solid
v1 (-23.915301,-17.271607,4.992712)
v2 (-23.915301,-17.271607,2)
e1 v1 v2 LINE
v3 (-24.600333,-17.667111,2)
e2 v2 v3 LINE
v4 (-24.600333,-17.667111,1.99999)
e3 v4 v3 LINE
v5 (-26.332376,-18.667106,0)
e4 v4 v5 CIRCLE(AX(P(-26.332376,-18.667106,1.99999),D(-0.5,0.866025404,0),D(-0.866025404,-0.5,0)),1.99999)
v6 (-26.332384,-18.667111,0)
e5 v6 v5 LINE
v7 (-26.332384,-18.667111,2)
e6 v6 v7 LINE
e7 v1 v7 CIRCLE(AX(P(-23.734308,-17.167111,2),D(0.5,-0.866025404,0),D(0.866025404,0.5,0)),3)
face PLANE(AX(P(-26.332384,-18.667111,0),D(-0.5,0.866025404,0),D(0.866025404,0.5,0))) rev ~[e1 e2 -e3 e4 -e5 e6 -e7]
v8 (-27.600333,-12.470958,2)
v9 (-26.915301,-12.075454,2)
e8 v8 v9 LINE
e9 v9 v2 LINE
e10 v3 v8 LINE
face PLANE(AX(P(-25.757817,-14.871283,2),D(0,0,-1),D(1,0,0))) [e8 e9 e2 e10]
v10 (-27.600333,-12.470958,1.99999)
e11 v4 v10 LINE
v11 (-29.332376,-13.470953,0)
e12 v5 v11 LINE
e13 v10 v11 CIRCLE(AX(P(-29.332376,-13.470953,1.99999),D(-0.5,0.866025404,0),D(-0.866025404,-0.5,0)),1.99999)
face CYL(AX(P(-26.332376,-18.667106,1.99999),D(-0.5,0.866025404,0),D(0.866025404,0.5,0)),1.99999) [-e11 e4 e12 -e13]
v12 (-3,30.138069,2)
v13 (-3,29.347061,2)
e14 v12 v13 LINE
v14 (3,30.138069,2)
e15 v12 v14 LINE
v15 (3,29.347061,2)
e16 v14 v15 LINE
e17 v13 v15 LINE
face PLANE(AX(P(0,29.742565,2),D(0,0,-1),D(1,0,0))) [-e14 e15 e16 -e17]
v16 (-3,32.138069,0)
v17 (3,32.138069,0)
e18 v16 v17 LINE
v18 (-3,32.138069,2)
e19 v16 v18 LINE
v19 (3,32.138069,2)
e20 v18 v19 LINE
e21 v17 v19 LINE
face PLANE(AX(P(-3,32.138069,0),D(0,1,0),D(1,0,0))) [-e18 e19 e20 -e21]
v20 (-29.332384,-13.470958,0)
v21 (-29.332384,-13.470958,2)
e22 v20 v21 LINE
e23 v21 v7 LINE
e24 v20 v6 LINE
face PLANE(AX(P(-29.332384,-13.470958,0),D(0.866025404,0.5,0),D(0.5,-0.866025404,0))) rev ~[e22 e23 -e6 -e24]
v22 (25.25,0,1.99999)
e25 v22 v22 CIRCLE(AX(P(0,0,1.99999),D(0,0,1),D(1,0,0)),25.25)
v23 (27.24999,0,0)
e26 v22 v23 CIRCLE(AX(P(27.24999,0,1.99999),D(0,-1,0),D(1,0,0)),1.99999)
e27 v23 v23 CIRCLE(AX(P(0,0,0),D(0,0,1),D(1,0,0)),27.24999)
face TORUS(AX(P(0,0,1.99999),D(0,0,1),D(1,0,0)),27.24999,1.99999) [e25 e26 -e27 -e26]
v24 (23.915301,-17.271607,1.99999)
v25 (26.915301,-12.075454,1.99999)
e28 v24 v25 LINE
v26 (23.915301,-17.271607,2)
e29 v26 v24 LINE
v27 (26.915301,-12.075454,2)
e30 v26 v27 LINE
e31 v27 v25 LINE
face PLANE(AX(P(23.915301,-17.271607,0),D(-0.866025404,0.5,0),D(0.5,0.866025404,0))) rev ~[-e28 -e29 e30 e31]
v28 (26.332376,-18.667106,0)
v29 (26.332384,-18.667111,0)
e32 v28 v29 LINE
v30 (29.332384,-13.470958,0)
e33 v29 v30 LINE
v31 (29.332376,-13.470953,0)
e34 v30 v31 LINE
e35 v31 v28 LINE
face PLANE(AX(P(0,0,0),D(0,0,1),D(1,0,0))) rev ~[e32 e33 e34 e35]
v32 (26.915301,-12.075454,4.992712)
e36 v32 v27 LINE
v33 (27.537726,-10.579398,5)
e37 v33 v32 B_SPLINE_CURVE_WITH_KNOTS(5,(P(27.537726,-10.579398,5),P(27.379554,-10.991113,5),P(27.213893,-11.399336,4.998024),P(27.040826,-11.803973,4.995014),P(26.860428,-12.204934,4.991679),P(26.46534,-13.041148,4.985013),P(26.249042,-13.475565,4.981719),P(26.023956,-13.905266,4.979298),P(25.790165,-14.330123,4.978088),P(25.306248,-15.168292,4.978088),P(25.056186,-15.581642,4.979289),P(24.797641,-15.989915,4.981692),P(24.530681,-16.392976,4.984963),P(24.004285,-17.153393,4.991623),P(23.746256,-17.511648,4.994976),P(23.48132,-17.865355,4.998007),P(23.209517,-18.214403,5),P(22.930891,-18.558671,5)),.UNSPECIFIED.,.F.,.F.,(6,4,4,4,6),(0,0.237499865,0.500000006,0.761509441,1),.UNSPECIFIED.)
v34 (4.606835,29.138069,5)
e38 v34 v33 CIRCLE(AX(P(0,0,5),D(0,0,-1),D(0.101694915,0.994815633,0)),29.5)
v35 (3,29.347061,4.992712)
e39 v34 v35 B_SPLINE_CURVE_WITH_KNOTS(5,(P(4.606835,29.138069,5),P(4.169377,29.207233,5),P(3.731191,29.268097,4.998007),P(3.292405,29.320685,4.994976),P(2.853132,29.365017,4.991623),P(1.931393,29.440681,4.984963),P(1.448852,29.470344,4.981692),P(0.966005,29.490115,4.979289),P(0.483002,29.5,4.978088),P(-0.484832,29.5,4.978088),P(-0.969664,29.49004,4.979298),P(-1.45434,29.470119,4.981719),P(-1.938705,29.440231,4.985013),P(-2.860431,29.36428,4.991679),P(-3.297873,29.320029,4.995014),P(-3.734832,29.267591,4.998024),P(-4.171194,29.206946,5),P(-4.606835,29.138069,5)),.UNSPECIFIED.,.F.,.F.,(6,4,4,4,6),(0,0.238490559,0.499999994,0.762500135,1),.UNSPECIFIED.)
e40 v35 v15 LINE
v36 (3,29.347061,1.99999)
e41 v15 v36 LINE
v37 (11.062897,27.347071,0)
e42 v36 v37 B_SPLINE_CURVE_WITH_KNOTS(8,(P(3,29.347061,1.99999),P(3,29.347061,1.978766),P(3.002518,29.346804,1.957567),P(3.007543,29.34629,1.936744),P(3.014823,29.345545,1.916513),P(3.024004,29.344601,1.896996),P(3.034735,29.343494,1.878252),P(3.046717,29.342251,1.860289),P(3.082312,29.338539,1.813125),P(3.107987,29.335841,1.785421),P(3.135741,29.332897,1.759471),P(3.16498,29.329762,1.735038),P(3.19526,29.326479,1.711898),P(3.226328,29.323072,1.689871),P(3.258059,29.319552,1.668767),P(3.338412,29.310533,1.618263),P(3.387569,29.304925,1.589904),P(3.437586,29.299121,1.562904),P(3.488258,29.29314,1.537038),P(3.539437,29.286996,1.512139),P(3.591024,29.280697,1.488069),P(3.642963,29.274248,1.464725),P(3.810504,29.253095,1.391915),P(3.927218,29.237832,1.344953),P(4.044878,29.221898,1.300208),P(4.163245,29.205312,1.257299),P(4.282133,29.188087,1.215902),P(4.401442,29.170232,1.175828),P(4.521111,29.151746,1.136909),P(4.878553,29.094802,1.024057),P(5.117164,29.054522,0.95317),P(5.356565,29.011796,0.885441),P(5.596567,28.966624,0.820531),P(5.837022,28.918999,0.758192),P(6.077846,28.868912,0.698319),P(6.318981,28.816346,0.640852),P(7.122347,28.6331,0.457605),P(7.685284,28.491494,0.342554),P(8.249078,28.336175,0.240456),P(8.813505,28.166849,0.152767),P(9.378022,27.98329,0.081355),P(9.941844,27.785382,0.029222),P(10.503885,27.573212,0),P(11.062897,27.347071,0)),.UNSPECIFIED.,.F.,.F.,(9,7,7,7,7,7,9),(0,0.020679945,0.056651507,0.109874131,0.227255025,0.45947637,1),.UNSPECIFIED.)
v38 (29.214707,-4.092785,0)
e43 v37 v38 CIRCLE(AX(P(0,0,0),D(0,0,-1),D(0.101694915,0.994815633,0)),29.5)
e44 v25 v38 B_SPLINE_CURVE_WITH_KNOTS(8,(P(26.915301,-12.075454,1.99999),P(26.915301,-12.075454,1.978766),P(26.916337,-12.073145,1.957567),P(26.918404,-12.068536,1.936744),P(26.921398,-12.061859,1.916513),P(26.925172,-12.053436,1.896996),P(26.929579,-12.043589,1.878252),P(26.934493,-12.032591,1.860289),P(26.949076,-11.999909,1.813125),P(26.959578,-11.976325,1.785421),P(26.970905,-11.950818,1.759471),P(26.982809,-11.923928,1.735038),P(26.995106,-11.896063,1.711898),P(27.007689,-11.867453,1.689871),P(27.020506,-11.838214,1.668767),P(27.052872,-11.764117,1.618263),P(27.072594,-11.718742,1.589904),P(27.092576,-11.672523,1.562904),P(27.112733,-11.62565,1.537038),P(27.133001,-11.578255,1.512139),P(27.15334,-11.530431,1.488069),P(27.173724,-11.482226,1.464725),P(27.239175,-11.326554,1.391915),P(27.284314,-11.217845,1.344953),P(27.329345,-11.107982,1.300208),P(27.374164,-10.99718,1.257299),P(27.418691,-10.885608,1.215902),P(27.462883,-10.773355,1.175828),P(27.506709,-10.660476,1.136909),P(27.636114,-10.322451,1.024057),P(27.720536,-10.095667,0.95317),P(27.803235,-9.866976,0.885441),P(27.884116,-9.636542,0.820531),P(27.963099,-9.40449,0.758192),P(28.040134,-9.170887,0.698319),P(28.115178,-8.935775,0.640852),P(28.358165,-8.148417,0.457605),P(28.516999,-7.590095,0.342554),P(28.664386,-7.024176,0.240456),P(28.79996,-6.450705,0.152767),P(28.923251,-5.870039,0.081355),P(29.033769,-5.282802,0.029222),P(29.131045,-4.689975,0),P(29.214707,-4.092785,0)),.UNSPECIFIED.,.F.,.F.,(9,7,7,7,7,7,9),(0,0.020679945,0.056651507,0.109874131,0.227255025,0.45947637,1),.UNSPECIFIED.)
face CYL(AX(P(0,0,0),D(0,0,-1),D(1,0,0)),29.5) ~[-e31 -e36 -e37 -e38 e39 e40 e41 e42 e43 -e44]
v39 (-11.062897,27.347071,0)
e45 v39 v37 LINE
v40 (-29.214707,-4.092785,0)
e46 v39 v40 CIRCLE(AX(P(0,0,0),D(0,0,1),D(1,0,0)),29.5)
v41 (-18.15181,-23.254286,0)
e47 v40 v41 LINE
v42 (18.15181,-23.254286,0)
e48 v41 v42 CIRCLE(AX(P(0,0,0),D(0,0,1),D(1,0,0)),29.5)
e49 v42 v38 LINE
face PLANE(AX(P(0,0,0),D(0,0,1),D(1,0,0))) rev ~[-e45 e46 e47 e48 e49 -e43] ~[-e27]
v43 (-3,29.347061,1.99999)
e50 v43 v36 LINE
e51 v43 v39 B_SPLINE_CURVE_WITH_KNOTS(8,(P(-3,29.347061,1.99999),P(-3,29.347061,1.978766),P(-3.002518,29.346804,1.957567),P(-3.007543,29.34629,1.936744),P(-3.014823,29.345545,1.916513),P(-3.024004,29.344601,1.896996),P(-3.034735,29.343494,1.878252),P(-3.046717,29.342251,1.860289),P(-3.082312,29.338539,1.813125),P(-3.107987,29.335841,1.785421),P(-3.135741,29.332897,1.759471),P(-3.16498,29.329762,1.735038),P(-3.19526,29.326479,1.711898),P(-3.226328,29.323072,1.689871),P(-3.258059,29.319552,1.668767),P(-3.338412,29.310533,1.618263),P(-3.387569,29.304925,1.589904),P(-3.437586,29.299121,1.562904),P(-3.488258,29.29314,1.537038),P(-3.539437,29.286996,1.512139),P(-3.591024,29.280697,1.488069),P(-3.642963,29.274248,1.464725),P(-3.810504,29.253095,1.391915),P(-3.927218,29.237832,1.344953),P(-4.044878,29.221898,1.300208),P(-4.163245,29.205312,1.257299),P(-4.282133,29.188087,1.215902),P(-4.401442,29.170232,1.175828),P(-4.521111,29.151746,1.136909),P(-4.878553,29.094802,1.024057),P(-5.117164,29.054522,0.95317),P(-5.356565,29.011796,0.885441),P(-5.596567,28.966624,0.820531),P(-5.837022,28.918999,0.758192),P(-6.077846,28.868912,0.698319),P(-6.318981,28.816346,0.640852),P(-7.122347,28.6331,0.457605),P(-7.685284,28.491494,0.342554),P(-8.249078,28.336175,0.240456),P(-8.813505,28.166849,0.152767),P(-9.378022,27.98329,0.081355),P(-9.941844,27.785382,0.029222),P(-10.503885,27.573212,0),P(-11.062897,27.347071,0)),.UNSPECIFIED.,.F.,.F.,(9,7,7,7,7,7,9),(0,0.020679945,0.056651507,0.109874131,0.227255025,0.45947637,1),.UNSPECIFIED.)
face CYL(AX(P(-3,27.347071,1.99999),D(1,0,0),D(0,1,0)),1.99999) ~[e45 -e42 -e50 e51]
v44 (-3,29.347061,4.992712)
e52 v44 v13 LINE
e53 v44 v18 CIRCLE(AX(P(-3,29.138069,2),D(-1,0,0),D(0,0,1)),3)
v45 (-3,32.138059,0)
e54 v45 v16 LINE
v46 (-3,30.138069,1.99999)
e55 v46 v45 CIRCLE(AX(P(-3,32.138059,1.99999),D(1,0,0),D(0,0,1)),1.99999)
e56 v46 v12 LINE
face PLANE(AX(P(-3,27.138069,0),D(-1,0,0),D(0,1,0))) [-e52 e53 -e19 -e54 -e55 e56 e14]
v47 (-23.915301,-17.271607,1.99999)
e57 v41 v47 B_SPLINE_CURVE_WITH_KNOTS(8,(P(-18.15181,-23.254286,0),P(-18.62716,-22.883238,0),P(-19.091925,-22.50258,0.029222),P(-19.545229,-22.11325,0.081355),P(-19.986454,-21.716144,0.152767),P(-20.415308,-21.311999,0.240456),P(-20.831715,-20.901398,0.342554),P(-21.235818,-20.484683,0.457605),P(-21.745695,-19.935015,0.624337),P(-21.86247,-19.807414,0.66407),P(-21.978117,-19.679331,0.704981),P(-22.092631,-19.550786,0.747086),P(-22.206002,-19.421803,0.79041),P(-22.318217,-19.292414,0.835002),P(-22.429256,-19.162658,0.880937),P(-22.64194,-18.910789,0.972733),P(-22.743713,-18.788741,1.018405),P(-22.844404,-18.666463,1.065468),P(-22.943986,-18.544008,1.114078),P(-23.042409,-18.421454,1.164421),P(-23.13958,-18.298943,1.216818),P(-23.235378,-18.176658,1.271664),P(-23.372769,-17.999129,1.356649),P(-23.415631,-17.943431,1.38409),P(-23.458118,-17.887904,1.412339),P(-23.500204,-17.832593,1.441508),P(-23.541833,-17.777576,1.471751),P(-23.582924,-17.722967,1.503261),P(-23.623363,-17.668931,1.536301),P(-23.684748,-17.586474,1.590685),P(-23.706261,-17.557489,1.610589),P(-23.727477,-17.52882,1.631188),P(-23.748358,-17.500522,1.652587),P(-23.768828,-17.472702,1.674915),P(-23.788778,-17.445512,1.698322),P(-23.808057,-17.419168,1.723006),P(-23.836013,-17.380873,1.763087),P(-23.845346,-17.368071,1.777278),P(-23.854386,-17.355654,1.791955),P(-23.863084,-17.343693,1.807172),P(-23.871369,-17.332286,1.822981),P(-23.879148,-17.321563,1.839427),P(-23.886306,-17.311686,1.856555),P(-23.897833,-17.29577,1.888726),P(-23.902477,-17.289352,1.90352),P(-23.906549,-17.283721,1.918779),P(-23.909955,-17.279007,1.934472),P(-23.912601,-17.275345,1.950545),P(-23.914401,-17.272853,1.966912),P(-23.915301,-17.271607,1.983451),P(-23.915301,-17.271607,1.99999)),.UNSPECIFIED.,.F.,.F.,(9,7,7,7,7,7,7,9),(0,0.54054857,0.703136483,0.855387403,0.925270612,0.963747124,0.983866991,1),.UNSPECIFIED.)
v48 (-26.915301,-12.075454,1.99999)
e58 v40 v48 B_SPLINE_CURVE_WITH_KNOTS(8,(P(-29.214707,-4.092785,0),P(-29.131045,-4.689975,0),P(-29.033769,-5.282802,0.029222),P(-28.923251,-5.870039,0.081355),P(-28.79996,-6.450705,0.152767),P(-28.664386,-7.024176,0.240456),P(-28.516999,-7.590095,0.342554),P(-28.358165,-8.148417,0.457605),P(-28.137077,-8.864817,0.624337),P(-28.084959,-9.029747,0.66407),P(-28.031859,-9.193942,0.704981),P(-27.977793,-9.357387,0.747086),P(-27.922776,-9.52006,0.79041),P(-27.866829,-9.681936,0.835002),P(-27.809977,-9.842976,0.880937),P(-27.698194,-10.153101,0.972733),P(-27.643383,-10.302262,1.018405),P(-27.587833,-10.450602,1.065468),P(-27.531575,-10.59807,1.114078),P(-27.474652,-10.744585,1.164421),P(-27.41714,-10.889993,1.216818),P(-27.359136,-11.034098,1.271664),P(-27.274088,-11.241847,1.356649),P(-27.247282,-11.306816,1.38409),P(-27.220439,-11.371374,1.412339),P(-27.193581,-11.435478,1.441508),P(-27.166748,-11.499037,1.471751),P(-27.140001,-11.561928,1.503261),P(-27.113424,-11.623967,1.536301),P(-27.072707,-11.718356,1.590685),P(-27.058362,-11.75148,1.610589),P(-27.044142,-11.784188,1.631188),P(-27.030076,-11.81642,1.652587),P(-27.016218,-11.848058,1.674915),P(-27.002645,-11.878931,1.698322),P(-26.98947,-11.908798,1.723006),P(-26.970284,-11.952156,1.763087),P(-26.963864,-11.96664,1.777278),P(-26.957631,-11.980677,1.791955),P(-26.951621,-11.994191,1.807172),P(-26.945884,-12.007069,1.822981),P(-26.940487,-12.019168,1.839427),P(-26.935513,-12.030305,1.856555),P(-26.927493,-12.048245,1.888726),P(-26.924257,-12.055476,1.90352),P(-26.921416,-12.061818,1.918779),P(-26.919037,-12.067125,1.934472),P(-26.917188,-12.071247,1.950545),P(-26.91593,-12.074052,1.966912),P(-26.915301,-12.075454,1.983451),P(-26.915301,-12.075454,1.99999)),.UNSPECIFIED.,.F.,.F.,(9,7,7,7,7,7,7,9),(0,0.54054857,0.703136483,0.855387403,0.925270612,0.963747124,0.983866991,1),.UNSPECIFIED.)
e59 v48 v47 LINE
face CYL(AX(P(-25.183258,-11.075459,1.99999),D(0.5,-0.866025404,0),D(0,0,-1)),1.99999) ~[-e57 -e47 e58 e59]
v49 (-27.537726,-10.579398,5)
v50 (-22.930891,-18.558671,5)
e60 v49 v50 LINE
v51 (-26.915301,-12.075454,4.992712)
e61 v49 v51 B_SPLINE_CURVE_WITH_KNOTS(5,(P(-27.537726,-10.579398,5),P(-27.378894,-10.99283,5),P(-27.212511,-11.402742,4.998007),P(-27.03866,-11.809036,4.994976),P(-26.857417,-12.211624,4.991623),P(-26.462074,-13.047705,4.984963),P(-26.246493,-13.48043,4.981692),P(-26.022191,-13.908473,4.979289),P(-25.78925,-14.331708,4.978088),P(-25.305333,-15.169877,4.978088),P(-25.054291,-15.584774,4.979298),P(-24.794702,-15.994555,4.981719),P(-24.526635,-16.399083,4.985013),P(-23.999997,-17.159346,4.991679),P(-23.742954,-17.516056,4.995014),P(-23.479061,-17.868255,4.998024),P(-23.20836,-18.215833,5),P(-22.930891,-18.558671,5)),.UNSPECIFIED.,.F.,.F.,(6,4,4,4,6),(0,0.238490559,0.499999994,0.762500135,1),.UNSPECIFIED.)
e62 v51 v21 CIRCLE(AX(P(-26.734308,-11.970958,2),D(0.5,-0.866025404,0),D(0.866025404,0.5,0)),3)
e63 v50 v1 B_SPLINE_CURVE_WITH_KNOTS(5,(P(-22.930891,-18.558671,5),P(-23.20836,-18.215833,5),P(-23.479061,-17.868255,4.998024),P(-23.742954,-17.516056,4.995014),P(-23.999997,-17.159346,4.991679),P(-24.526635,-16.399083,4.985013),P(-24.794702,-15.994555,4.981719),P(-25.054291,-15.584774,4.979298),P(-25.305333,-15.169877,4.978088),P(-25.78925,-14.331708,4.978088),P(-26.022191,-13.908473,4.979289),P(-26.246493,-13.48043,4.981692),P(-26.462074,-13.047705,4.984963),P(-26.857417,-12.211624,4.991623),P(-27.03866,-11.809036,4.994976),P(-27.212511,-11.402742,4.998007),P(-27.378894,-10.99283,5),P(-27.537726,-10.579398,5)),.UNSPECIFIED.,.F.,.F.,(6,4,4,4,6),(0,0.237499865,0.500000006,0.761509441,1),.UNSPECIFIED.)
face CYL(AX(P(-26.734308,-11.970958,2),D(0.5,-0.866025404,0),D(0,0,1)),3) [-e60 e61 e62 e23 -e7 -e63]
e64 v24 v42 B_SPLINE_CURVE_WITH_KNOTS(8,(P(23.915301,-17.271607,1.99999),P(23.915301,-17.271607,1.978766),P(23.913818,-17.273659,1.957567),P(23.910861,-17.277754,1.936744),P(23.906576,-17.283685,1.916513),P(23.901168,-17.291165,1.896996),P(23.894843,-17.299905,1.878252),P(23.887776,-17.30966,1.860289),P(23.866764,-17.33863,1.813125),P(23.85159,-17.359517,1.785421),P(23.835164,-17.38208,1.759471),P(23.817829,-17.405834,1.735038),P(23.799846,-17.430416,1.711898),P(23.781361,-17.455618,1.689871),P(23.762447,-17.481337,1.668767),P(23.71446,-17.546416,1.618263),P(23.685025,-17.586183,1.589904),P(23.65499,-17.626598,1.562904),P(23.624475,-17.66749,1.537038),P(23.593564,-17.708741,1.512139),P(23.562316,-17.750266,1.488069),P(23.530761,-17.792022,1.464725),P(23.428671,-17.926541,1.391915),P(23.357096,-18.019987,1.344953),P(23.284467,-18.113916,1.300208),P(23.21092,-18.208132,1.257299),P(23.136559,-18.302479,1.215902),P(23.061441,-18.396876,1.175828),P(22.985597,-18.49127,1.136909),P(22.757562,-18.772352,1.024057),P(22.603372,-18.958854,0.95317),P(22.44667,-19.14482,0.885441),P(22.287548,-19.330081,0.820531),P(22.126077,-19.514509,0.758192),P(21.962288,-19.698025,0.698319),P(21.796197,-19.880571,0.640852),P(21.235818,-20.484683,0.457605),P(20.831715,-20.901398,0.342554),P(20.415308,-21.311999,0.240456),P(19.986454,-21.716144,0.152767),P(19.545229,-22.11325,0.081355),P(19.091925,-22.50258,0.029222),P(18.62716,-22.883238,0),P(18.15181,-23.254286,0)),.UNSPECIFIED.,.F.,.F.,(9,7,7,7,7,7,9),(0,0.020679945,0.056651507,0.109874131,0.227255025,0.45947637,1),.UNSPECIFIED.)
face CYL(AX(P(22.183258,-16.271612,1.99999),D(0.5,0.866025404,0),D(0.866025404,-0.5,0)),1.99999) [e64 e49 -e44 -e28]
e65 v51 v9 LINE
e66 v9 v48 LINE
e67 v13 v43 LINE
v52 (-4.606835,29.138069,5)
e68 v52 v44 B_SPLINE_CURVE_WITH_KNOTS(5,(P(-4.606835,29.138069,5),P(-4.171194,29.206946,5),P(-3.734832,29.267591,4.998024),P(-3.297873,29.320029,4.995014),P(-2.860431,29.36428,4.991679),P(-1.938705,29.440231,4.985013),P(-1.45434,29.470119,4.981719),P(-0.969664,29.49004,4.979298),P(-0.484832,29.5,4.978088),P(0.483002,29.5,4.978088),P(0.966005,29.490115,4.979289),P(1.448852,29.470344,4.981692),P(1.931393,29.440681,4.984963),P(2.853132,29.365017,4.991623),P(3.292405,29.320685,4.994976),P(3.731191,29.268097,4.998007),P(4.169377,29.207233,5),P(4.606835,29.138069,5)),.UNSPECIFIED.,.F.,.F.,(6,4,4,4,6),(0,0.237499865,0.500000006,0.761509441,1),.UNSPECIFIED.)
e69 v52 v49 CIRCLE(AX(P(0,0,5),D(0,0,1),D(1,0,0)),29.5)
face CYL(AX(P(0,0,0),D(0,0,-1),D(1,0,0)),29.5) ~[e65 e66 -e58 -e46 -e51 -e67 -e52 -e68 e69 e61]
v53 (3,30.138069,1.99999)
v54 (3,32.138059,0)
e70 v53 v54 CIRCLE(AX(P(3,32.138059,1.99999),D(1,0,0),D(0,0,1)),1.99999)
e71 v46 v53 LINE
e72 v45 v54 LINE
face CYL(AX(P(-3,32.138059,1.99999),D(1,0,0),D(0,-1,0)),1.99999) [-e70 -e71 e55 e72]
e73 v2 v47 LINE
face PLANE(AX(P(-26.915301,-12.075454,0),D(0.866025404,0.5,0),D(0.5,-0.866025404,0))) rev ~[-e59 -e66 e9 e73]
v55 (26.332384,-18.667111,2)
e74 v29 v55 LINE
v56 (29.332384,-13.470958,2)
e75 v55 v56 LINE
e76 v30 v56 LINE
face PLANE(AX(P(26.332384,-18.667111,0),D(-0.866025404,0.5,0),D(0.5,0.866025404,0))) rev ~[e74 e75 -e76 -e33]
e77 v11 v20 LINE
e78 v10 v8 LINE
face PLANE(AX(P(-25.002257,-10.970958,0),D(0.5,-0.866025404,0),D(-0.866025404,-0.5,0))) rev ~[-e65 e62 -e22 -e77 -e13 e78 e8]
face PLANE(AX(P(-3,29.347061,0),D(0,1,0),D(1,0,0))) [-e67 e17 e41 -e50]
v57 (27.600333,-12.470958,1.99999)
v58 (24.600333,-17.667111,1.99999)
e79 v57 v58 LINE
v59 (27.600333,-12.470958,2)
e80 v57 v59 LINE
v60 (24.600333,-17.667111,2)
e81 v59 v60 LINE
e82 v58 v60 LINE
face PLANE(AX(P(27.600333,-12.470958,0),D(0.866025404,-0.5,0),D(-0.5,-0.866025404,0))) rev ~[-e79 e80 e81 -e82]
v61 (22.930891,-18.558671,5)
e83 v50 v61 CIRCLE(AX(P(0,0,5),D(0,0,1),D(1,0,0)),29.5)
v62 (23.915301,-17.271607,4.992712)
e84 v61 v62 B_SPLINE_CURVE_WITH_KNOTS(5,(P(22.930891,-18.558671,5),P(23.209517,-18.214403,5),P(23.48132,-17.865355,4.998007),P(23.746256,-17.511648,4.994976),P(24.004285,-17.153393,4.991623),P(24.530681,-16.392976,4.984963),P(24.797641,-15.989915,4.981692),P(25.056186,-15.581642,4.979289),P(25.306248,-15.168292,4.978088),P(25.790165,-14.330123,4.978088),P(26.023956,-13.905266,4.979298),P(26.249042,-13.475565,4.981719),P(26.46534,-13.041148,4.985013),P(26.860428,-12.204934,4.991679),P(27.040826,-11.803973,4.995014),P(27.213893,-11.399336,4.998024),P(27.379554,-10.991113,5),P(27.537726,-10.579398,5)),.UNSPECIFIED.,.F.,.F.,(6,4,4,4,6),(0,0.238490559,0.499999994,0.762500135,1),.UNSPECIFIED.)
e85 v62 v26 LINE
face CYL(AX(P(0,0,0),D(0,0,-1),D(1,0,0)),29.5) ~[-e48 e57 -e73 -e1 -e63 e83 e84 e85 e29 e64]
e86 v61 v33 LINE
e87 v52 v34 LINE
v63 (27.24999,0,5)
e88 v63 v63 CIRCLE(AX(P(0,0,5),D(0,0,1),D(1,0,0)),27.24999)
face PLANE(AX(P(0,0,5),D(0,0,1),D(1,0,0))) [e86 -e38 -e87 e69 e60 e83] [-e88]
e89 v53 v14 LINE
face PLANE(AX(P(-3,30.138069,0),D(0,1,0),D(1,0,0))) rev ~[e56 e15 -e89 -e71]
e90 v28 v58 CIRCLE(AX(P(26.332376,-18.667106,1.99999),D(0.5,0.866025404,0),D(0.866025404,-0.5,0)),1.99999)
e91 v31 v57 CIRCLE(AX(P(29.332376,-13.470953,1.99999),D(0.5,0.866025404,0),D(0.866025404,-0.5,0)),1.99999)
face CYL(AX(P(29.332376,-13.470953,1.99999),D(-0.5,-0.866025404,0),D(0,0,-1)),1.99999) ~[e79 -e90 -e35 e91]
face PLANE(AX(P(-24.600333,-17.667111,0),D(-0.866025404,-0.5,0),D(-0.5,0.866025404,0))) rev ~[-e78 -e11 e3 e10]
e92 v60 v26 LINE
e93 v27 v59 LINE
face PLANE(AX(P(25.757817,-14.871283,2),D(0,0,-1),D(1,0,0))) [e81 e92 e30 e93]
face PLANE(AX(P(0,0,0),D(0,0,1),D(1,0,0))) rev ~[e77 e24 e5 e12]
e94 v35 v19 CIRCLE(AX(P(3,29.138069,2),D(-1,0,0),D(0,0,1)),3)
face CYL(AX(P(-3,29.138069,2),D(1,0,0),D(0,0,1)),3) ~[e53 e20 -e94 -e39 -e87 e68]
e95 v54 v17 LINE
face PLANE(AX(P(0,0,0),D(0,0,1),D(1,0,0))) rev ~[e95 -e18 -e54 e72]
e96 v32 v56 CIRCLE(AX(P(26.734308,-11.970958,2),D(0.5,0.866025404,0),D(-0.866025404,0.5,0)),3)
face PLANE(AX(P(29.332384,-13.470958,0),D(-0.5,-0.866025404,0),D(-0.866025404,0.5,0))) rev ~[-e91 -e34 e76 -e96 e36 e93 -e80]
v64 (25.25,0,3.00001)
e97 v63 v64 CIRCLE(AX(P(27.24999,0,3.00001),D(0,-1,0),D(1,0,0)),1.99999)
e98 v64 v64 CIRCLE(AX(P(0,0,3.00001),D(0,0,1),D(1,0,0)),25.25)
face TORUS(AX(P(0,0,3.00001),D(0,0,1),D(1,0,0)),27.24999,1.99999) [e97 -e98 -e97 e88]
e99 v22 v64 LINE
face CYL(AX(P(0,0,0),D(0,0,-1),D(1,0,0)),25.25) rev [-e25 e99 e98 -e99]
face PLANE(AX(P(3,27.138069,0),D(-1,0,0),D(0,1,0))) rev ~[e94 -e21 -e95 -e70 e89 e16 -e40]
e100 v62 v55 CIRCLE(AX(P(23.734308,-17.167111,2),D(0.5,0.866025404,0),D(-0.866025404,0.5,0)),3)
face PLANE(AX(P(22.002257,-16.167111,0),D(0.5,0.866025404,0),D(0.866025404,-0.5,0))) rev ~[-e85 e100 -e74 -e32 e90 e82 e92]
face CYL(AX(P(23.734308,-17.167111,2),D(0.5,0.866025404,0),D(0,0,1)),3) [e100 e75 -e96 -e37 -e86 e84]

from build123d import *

# Parameters (mm, degrees)
F0_R     = 29.5
F0_R_2   = 25.25
F1_DEPTH = 5
F3_W     = 6
F3_H     = 5
F4_DEPTH = 5
F5_R     = 3
F6_W     = 6
F6_H     = 0.7910079116
F7_DEPTH = 2
F8_R     = 1.99999


# Not quite as in the source:
# - a fillet or chamfer is up to 0.001 mm smaller than in the source, because OpenCascade refuses the exact size
# - a feature of the source that left no trace in its solid (it failed there, or was rolled back) is left out


with BuildPart() as f1:
    # F0 (on Top) → F1 (new body)
    with BuildSketch(Plane.XY):
        Circle(F0_R)
        Circle(F0_R_2, mode=Mode.SUBTRACT)
    extrude(amount=F1_DEPTH)

    # F3 (on Top) → F4 (join)
    with BuildSketch(Plane.XY):
        with Locations((0, 29.6380690932)):
            Rectangle(F3_W, F3_H)
        Polygon((-29.3323842633, -13.4709583353), (-26.3323842633, -18.667110758), (-22.0022572444, -16.167110758), (-25.0022572444, -10.9709583353), align=None)
        Polygon((26.3323842633, -18.667110758), (29.3323842633, -13.4709583353), (25.0022572444, -10.9709583353), (22.0022572444, -16.167110758), align=None)
    extrude(amount=F4_DEPTH)

    # F5
    f5_edges = [f1.edges().sort_by_distance(p)[0] for p in [
        (0, 32.138069, 5),
        (-27.832384, -16.069035, 5),
        (27.832384, -16.069035, 5),
    ]]
    fillet(f5_edges, radius=F5_R)

    # F6 (on face) → F7 (cut)
    with BuildSketch(Plane(origin=(0, 0, 0), x_dir=(1, 0, 0), z_dir=(0, 0, -1))):
        with Locations((0, -29.7425651374)):
            Rectangle(F6_W, F6_H)
        Polygon((24.6003334557, 17.667110758), (23.9153005097, 17.2716068022), (26.9153005097, 12.0754543795), (27.6003334557, 12.4709583353), align=None)
        Polygon((-27.6003334557, 12.4709583353), (-26.9153005097, 12.0754543795), (-23.9153005097, 17.2716068022), (-24.6003334557, 17.667110758), align=None)
    extrude(amount=-F7_DEPTH, mode=Mode.SUBTRACT)

    # F8 (radius 2 in the source; OpenCascade refuses exactly that, so slightly less here)
    f8_edges = [f1.edges().sort_by_distance(p)[0] for p in [
        (0, 29.347061, 0),
        (0, 30.138069, 0),
        (26.100333, -15.069035, 0),
        (25.415301, -14.673531, 0),
        (-25.415301, -14.673531, 0),
        (-26.100333, -15.069035, 0),
        (-25.25, 0, 0),
        (-25.25, 0, 5),
    ]]
    fillet(f8_edges, radius=F8_R)


solid = f1.part
